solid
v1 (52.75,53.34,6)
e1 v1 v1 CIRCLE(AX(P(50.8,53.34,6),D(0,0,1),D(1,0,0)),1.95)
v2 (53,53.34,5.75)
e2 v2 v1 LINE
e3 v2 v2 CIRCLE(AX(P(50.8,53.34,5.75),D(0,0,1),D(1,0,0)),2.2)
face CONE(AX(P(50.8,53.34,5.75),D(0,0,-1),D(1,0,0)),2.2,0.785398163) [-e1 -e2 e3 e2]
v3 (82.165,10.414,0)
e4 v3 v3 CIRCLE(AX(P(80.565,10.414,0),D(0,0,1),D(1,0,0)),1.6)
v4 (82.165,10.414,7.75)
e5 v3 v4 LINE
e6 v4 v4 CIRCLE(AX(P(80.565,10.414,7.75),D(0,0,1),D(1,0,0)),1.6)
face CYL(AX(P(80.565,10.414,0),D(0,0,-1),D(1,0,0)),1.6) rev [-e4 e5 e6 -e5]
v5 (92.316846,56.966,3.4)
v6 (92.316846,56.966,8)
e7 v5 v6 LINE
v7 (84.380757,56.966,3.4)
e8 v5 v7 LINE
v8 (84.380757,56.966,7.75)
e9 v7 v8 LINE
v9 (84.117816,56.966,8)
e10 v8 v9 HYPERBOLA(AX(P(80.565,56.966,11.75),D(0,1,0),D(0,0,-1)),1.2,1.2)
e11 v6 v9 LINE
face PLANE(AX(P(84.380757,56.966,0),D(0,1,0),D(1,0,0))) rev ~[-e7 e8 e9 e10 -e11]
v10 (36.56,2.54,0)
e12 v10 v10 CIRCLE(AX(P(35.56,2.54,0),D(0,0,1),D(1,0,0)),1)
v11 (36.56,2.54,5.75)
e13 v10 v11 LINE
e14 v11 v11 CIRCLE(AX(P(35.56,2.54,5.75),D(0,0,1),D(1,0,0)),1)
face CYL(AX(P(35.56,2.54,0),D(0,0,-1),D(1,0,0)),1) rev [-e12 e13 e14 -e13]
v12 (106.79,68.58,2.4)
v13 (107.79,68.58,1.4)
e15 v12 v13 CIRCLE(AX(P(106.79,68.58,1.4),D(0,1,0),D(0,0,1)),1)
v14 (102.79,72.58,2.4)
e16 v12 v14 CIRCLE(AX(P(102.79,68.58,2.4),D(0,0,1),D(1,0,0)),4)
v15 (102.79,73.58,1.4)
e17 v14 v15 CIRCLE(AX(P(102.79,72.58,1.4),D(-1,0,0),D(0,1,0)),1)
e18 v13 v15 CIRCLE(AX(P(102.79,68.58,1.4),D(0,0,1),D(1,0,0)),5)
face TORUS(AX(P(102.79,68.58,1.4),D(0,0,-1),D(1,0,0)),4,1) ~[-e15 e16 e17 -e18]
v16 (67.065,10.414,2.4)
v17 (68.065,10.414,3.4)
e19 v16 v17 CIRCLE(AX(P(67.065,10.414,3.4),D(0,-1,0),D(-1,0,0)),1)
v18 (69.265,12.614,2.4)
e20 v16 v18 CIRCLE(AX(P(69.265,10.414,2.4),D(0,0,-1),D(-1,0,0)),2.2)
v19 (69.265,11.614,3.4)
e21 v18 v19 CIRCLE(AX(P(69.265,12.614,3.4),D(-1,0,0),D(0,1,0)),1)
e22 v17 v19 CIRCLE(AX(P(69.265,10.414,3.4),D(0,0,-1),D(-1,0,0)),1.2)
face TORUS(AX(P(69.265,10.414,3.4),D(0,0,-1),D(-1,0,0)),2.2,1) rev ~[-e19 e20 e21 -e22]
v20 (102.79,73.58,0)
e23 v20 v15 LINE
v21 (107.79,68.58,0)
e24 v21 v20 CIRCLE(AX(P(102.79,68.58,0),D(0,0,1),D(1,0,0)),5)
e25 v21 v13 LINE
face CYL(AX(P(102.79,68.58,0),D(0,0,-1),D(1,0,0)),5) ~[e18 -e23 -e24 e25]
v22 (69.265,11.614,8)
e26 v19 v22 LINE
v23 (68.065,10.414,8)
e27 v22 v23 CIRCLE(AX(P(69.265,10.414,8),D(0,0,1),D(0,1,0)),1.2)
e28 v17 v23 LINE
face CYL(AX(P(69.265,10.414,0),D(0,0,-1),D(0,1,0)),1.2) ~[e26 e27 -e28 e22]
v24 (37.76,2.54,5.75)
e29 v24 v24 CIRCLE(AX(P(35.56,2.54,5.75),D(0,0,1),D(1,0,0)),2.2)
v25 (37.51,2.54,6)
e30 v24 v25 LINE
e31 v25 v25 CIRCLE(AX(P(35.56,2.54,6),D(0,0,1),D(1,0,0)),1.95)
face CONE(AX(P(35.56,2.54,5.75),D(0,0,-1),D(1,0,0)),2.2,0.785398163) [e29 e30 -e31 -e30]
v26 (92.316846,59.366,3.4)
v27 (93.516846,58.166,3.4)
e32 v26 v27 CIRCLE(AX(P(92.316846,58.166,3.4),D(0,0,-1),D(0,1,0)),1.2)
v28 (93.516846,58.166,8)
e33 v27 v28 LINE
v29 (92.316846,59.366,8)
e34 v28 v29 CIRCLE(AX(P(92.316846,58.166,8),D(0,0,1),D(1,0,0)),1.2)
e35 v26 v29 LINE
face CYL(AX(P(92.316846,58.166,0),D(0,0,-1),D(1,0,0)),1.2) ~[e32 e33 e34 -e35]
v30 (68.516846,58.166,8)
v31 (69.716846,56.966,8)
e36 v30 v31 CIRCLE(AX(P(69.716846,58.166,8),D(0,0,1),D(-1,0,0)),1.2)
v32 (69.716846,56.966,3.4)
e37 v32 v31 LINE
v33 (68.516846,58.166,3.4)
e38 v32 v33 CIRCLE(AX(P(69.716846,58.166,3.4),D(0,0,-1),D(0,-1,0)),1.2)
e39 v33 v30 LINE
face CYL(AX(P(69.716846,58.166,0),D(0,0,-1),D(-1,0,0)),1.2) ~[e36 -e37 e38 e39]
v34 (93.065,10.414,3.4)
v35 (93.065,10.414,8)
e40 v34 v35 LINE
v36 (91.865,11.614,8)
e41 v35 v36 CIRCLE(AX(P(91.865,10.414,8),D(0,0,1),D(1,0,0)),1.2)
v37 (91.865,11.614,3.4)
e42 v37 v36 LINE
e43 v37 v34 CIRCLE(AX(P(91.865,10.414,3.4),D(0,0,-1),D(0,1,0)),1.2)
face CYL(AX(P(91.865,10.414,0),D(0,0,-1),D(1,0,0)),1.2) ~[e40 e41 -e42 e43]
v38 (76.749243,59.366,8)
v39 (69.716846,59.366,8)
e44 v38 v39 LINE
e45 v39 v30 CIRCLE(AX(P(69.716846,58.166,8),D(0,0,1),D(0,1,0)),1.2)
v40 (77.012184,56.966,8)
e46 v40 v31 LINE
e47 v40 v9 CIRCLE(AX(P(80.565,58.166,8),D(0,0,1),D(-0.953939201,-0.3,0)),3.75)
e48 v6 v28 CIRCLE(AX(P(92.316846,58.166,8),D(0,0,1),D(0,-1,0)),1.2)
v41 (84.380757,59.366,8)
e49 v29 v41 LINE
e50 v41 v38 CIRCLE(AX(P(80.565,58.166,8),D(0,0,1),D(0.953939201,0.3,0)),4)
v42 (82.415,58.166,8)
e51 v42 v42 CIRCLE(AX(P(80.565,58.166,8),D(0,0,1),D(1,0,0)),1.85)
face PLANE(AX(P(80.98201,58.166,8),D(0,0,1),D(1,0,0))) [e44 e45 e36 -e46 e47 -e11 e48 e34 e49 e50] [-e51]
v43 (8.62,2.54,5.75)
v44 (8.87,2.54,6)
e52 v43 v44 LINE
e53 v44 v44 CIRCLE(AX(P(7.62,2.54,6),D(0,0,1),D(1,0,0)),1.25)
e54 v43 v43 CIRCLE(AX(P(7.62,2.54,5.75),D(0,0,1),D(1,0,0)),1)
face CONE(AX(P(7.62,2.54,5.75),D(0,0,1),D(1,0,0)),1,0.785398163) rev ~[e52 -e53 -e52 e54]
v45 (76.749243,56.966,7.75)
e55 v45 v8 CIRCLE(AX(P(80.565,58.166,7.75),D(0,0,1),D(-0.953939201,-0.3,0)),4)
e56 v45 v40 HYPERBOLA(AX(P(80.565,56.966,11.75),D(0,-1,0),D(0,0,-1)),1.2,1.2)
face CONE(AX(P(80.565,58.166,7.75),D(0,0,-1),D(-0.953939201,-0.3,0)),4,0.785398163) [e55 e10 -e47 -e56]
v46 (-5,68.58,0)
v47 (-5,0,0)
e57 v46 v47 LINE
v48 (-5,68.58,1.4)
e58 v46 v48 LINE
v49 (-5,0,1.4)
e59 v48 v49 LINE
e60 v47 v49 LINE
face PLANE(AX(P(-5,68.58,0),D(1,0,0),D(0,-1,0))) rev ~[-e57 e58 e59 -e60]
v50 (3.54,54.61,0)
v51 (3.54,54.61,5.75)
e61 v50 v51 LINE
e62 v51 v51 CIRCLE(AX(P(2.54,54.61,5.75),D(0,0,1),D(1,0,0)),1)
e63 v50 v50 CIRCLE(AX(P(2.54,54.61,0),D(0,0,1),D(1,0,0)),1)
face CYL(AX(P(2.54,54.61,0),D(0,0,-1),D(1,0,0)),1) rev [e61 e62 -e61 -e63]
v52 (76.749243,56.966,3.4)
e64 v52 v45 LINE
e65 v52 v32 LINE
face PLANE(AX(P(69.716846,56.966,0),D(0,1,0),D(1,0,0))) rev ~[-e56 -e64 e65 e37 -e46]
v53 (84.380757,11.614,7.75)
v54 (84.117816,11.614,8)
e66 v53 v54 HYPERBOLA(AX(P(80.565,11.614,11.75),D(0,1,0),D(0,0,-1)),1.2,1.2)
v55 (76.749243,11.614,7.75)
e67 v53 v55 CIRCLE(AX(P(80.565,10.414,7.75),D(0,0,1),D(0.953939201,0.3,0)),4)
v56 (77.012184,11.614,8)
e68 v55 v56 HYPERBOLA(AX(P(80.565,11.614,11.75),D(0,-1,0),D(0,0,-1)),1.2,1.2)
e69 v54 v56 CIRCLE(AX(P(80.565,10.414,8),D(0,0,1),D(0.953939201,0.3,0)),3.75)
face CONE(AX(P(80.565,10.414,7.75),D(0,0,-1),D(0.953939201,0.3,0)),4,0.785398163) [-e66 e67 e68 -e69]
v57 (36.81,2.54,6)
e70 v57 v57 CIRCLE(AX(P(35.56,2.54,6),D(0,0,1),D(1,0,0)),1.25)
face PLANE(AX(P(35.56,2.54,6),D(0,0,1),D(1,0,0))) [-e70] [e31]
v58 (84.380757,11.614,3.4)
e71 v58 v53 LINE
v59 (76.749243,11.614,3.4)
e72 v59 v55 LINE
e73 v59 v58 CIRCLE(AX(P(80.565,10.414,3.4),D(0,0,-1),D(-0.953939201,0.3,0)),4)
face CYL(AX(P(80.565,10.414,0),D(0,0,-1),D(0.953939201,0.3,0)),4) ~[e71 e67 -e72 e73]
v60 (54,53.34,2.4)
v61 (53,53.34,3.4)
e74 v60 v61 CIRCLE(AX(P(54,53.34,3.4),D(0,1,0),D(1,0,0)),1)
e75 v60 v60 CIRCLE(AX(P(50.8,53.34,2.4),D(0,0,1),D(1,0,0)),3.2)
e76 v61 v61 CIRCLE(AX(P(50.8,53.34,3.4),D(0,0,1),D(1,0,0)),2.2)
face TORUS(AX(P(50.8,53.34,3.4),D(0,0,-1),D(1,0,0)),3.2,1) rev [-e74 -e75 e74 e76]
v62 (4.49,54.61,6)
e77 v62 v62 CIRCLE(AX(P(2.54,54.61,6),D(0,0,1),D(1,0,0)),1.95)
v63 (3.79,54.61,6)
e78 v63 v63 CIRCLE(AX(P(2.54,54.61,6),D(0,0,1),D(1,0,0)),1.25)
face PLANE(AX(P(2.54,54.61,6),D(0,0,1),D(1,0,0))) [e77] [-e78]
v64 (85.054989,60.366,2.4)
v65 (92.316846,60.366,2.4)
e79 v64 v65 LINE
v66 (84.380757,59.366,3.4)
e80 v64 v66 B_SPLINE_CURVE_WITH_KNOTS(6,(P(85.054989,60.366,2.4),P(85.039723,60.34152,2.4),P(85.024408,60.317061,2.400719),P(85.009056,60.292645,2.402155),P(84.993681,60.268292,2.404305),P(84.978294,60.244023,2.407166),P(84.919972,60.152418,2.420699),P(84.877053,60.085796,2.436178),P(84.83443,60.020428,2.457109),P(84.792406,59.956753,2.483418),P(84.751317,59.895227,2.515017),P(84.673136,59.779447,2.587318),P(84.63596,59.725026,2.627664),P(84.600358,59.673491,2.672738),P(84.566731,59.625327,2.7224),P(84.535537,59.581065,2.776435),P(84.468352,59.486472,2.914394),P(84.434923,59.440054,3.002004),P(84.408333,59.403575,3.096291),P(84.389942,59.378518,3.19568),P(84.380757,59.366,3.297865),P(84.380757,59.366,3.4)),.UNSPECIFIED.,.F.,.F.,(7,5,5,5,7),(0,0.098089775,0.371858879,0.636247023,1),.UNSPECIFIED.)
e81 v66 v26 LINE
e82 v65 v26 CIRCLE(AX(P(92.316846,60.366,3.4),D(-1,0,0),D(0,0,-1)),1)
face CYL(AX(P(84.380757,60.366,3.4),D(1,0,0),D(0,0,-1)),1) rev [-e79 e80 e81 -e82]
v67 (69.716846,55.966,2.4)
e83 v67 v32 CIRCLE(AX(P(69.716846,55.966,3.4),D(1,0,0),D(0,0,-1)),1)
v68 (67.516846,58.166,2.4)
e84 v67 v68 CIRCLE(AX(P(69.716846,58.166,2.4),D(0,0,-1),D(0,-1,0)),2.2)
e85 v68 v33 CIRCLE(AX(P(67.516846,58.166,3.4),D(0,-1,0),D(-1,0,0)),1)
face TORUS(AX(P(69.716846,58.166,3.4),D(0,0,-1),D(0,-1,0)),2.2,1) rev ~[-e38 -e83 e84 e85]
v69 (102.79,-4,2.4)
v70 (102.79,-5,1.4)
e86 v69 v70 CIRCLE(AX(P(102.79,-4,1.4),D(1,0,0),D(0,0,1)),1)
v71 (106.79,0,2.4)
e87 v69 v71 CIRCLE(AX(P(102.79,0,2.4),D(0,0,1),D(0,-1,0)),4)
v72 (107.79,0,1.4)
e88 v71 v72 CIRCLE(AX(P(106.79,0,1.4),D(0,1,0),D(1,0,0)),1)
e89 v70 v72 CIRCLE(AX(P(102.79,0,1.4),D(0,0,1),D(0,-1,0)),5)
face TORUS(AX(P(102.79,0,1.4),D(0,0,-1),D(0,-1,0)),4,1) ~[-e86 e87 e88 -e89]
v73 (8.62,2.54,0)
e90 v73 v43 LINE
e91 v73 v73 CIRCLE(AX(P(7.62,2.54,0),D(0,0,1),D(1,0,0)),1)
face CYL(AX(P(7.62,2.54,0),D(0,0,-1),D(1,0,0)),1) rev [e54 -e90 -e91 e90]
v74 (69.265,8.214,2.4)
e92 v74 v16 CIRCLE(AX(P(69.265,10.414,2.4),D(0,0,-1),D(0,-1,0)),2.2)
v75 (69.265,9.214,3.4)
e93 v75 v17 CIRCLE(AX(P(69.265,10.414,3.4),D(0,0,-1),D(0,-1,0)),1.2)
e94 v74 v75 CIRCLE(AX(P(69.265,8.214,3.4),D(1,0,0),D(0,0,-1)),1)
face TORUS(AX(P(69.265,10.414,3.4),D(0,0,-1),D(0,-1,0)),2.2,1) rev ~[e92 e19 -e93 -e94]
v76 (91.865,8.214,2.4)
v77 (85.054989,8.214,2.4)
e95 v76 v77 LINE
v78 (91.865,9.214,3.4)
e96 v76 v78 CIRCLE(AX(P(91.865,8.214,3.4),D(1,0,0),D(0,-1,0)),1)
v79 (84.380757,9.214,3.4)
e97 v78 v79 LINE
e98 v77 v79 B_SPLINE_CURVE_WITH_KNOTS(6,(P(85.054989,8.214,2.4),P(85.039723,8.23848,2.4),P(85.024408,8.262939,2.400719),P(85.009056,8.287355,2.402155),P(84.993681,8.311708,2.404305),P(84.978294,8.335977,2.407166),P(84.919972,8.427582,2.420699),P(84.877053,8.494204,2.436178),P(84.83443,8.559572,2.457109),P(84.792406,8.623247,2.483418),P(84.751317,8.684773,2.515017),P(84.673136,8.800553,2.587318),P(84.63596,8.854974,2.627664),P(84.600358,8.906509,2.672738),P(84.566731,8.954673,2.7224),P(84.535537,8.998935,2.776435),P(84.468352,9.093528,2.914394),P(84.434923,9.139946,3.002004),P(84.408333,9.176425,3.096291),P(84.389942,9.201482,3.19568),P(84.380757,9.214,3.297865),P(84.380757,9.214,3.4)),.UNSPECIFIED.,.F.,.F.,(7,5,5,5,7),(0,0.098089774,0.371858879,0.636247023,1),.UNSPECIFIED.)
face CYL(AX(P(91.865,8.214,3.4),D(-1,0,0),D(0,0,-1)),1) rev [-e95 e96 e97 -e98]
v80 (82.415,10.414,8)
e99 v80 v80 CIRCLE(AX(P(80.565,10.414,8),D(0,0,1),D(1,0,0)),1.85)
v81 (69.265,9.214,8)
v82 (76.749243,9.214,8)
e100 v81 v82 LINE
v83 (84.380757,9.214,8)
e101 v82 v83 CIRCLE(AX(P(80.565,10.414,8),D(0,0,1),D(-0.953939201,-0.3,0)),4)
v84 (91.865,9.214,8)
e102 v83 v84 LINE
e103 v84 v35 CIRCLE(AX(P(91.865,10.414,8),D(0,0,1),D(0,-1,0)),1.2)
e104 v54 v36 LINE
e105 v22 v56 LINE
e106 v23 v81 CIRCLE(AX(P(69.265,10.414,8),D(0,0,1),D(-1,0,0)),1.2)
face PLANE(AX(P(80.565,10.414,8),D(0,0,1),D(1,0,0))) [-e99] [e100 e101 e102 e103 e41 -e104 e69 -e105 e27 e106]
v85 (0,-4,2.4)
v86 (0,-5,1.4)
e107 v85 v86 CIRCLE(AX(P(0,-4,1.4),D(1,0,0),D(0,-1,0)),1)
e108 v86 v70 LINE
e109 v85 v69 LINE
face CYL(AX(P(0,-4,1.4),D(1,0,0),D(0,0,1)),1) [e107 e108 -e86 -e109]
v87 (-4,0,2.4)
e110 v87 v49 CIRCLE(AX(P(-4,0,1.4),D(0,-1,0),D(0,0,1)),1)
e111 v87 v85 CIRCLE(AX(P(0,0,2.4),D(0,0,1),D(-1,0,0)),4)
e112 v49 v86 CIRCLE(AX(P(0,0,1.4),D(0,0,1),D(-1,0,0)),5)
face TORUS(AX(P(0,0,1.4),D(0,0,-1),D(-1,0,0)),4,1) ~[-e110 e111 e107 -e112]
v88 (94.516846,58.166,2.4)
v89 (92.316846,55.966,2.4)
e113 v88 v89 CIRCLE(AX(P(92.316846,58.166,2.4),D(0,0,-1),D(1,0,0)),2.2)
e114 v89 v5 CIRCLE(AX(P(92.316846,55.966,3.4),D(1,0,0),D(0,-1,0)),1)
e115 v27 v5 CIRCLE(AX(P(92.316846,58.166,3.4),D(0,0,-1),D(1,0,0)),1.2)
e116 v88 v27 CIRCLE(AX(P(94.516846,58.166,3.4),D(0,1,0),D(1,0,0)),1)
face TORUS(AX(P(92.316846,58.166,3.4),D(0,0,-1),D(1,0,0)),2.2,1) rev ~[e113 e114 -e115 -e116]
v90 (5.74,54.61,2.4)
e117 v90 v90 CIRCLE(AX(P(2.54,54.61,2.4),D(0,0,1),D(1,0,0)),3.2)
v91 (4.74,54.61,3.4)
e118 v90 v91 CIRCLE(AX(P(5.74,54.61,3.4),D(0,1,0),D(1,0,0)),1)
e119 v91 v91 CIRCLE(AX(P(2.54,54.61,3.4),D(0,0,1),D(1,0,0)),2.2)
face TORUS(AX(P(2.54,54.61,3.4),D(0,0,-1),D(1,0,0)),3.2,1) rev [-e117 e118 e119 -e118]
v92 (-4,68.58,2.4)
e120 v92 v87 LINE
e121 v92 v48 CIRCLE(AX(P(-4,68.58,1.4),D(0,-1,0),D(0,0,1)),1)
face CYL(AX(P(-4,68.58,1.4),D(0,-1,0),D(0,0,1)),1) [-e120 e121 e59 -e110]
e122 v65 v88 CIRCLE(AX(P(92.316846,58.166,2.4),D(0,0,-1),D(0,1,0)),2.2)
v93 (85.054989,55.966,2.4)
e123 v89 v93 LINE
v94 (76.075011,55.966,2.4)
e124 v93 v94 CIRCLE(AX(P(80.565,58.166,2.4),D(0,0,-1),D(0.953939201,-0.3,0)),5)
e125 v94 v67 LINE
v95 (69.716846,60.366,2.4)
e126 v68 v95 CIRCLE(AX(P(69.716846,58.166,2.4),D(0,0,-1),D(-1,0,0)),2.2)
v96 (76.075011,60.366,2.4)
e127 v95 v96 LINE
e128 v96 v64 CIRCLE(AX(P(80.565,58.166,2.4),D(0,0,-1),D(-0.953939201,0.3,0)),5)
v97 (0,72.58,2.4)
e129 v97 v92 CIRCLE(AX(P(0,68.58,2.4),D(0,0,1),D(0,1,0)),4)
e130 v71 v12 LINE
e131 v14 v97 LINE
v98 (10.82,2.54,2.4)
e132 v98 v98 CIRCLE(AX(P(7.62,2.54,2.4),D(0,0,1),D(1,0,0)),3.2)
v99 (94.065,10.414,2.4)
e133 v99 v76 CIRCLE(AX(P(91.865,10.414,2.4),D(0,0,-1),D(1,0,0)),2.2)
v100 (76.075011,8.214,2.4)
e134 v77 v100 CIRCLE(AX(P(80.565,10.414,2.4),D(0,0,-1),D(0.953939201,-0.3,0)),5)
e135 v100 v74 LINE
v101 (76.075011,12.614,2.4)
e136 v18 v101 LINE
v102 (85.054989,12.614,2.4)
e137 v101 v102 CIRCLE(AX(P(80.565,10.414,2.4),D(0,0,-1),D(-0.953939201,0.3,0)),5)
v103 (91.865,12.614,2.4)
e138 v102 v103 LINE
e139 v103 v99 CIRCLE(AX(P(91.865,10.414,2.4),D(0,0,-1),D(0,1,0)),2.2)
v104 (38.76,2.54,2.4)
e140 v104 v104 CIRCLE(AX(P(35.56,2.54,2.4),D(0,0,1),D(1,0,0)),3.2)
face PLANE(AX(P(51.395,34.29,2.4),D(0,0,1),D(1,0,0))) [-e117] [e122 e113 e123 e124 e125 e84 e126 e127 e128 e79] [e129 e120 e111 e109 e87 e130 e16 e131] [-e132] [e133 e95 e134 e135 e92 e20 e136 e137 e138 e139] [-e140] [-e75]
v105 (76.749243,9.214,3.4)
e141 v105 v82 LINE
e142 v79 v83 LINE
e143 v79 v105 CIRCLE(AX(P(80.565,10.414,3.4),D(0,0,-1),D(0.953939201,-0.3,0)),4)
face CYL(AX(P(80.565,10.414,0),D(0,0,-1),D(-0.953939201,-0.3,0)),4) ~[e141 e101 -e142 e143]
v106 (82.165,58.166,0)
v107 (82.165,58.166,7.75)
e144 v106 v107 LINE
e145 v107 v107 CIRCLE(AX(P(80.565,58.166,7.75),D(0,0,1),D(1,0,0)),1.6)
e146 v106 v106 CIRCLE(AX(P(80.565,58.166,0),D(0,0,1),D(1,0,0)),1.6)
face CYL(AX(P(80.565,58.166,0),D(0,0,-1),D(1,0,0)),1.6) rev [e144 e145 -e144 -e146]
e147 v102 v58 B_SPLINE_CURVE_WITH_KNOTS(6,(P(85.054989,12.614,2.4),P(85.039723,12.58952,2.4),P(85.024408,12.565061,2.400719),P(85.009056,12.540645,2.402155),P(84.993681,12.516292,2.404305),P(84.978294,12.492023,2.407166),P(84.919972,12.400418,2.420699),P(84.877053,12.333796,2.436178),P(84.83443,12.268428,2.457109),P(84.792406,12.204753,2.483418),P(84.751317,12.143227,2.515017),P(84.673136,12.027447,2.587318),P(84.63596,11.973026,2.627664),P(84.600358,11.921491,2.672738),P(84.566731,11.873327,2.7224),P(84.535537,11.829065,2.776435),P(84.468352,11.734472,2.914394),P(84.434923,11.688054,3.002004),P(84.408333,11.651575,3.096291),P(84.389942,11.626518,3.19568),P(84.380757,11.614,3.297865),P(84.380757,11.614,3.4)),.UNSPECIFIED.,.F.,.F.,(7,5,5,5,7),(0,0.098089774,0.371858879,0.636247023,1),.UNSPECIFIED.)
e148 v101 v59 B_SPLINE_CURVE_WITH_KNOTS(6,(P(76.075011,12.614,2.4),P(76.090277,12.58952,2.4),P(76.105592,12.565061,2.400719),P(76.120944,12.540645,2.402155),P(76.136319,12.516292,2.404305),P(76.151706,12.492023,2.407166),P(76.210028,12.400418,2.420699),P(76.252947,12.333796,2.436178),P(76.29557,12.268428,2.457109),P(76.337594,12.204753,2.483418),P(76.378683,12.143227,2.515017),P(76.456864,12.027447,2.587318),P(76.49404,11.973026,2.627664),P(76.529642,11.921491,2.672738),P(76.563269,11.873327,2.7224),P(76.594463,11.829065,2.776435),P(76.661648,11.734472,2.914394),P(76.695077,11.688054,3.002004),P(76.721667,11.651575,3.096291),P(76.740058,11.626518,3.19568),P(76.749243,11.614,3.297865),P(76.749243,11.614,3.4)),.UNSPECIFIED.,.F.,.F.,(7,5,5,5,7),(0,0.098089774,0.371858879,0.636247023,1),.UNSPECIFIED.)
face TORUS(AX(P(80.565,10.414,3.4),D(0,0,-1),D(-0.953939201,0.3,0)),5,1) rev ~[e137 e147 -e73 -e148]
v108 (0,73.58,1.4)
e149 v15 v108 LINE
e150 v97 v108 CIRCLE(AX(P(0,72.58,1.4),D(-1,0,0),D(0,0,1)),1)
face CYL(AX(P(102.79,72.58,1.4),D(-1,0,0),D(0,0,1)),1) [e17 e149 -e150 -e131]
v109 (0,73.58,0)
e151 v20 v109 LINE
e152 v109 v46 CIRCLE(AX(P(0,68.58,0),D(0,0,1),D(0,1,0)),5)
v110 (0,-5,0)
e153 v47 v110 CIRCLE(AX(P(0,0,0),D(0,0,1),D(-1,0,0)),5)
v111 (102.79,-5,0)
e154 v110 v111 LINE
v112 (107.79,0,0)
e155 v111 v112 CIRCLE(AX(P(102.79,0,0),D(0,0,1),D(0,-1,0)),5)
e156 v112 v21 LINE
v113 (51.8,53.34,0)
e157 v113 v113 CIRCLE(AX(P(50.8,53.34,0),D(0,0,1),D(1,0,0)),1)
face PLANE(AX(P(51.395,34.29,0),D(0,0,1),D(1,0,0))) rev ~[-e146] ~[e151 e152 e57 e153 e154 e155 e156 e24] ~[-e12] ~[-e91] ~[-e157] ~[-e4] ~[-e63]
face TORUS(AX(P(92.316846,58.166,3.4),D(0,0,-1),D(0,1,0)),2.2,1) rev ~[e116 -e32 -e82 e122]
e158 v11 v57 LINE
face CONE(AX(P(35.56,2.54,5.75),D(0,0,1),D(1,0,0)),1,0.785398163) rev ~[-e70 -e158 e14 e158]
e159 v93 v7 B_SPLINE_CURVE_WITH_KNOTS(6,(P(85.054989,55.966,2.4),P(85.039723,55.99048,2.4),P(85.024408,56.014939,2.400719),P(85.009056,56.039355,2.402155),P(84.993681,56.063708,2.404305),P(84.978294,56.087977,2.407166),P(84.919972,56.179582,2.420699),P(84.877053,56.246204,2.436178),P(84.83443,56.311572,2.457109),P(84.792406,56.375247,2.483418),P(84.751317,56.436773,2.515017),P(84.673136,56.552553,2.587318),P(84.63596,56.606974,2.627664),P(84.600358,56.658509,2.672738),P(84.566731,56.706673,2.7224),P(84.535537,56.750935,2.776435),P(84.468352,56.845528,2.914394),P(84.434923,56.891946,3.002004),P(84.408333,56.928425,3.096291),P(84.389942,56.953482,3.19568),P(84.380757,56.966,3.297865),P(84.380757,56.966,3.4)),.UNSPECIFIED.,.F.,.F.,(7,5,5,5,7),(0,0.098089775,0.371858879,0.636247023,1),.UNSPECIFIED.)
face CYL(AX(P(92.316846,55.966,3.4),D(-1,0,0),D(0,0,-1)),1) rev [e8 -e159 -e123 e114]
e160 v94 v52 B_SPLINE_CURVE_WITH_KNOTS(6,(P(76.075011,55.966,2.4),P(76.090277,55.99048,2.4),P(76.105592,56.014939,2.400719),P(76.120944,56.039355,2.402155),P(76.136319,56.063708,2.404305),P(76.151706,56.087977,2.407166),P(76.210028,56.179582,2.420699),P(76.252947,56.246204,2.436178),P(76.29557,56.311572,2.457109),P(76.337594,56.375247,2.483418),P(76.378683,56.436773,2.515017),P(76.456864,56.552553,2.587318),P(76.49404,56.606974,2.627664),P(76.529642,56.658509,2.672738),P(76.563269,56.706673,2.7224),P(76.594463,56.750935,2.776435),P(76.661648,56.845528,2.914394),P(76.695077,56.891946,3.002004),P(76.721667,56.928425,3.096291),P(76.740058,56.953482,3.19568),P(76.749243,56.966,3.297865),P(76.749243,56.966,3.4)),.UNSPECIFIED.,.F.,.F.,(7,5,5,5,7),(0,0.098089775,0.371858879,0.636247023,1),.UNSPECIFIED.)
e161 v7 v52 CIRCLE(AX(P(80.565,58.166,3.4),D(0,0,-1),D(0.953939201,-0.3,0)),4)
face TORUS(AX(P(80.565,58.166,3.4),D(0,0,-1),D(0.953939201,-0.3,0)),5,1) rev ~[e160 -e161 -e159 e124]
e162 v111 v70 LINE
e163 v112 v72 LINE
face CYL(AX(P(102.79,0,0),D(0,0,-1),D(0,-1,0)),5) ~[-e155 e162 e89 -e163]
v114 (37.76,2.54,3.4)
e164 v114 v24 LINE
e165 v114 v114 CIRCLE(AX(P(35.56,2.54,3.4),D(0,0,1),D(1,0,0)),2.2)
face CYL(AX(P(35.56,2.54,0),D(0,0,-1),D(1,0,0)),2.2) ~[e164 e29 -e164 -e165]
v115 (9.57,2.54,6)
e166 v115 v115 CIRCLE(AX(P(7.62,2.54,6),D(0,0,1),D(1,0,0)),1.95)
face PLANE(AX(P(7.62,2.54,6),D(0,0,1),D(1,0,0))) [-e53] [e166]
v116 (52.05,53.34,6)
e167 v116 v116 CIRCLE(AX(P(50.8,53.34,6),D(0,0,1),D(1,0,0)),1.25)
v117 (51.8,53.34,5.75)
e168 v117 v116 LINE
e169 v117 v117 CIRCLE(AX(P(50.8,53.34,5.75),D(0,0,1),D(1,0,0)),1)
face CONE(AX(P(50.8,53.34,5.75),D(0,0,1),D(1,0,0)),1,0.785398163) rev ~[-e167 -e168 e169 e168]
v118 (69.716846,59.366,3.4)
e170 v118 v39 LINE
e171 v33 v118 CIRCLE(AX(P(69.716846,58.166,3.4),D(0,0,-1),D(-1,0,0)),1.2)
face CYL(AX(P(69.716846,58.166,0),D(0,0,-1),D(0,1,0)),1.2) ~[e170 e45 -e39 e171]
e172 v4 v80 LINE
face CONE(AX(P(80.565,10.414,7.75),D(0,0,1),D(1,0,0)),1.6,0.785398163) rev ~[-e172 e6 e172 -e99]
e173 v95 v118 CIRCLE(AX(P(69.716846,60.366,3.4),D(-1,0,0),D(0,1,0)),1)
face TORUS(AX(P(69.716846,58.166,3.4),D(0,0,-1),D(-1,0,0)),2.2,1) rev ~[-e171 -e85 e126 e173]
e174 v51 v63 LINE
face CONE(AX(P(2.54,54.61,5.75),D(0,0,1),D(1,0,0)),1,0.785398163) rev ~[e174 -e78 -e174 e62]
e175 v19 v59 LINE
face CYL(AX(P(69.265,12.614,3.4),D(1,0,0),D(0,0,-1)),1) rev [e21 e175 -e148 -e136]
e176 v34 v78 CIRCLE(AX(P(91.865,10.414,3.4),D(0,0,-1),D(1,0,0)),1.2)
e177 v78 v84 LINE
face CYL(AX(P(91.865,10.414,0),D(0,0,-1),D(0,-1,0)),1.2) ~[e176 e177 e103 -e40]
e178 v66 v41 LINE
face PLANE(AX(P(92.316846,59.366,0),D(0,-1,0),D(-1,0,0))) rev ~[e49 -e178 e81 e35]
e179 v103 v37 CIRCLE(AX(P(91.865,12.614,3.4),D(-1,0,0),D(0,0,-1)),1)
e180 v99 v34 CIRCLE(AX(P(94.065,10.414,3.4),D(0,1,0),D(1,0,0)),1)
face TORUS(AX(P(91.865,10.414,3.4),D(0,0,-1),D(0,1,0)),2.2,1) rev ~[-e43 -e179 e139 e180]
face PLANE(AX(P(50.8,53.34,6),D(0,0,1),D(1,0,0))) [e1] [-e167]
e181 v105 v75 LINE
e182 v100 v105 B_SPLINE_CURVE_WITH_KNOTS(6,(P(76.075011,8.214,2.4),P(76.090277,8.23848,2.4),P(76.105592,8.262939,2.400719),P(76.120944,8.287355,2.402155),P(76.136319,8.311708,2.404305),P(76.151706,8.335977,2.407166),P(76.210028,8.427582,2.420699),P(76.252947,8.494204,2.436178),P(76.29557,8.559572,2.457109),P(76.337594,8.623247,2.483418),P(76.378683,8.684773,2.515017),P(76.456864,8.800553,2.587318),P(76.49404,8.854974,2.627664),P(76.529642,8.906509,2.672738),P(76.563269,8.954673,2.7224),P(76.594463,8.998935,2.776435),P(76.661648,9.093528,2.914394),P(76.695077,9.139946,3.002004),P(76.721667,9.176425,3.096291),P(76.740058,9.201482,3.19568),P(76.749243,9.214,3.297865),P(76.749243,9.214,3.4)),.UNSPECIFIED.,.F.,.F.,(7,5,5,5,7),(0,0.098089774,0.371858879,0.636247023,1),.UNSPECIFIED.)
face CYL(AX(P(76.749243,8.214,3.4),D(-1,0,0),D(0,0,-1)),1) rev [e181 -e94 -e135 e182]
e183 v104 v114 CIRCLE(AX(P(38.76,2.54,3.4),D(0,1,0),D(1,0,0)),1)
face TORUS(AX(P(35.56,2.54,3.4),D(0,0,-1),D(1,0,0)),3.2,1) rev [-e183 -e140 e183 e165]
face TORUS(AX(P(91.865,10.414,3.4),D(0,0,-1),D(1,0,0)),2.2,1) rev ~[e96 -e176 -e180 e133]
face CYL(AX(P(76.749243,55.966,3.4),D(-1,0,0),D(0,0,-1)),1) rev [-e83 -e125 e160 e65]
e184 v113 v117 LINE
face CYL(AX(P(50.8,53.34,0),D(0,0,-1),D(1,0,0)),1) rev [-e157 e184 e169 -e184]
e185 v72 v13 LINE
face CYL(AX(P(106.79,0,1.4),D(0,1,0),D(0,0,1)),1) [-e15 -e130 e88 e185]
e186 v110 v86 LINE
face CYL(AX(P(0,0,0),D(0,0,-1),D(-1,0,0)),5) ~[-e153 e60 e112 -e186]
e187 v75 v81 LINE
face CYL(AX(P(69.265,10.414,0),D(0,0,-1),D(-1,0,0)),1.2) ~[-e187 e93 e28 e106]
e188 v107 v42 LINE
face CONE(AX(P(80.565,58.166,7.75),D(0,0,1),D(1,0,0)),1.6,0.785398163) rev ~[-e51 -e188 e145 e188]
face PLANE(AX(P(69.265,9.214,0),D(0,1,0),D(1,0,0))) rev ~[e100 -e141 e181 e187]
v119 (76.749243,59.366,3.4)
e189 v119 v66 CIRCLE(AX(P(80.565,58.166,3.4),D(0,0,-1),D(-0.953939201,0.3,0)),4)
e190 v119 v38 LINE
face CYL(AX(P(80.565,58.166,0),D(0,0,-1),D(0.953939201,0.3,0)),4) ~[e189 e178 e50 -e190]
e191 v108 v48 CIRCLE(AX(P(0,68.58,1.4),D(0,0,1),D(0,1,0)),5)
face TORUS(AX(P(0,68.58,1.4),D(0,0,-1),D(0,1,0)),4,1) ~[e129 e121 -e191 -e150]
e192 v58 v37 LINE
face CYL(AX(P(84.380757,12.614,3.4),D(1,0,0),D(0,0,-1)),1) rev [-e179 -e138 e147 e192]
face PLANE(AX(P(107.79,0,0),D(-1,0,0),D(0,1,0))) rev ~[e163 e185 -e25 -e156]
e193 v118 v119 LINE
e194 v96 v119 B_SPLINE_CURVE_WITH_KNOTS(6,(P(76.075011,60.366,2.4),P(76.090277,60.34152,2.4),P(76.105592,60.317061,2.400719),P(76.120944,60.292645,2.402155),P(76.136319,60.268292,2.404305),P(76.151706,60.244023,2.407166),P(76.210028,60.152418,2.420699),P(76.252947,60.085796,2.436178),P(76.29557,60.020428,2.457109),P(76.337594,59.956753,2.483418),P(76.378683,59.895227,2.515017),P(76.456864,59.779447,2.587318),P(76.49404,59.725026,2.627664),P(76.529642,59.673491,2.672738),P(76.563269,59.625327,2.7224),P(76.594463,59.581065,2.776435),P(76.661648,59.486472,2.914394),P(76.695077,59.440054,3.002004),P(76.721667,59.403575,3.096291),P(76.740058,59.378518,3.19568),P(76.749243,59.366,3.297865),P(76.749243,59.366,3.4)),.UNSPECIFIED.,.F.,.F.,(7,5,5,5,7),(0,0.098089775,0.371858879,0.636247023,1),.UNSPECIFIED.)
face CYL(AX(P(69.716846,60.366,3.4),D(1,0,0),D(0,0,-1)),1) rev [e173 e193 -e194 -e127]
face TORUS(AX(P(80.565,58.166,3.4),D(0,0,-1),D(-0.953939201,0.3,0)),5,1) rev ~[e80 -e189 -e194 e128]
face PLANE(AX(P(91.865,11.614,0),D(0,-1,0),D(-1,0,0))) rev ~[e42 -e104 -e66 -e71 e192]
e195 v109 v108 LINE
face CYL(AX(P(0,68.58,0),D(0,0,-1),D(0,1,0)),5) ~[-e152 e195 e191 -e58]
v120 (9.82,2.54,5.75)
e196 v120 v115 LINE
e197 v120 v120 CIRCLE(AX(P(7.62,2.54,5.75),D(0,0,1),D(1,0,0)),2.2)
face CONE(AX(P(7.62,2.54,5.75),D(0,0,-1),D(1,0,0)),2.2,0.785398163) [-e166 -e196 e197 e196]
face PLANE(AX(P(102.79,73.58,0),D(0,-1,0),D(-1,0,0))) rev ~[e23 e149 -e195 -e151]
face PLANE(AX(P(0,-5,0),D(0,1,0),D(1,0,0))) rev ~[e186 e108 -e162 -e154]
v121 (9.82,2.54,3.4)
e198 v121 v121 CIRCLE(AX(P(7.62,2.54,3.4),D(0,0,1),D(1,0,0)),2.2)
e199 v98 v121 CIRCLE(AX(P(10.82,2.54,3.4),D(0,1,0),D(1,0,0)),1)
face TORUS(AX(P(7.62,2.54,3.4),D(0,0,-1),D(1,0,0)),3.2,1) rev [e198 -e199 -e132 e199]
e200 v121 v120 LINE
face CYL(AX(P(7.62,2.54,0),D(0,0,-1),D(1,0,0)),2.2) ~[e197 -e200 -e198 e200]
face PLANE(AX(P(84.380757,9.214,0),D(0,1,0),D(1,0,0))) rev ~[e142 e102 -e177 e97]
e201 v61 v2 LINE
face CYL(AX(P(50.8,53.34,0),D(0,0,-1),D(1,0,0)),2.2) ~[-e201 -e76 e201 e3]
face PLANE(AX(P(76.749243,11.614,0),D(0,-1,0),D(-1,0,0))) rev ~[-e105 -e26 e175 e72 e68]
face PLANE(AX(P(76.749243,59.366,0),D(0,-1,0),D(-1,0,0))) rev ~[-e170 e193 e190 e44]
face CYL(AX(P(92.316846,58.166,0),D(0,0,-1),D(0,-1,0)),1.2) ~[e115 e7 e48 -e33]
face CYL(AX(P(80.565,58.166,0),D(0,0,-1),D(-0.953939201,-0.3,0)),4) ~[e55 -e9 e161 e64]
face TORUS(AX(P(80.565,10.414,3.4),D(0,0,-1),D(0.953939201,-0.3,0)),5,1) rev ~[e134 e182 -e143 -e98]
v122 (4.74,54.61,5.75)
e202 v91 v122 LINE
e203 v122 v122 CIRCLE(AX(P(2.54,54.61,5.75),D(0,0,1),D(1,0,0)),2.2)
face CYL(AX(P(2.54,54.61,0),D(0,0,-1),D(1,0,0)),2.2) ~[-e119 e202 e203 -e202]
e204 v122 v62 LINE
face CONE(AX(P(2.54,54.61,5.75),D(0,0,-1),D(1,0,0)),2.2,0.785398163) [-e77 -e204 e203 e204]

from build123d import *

# Parameters (mm, degrees)
F0_R     = 2.2
F0_R_2   = 1
F1_DEPTH = 6
F0_R_3   = 1.6
F2_DEPTH = 8
F0_W     = 102.79
F0_H     = 68.58
F3_DEPTH = 2.4
F4_SIZE  = 0.25
F5_R     = 1
F6_R     = 1
F7_R     = 1


with BuildPart() as f1:
    # F0 (on Top) → F1 (new body)
    with BuildSketch(Plane.XY):
        with Locations((2.54, 54.61)):
            Circle(F0_R)
        with Locations((2.54, 54.61)):
            Circle(F0_R_2, mode=Mode.SUBTRACT)
    extrude(amount=F1_DEPTH)



with BuildPart() as f1b:
    # F0 (on Top) → F1, piece 2 (new body)
    with BuildSketch(Plane.XY):
        with Locations((7.62, 2.54)):
            Circle(F0_R)
        with Locations((7.62, 2.54)):
            Circle(F0_R_2, mode=Mode.SUBTRACT)
    extrude(amount=F1_DEPTH)


with BuildPart() as f1c:
    # F0 (on Top) → F1, piece 3 (new body)
    with BuildSketch(Plane.XY):
        with Locations((35.56, 2.54)):
            Circle(F0_R)
        with Locations((35.56, 2.54)):
            Circle(F0_R_2, mode=Mode.SUBTRACT)
    extrude(amount=F1_DEPTH)


with BuildPart() as f1d:
    # F0 (on Top) → F1, piece 4 (new body)
    with BuildSketch(Plane.XY):
        with Locations((50.8, 53.34)):
            Circle(F0_R)
        with Locations((50.8, 53.34)):
            Circle(F0_R_2, mode=Mode.SUBTRACT)
    extrude(amount=F1_DEPTH)


with BuildPart() as f2:
    # F0 (on Top) → F2 (new body)
    with BuildSketch(Plane.XY):
        with BuildLine():
            Line((69.7168460011, 56.966), (76.7492431943, 56.966))
            ThreePointArc((76.7492431943, 56.966), (80.565, 54.166), (84.3807568057, 56.966))
            Line((84.3807568057, 56.966), (92.3168460011, 56.966))
            ThreePointArc((92.3168460011, 56.966), (93.1653741386, 57.3174718626), (93.5168460011, 58.166))
            ThreePointArc((93.5168460011, 58.166), (93.1653741386, 59.0145281374), (92.3168460011, 59.366))
            Line((92.3168460011, 59.366), (84.3807568057, 59.366))
            ThreePointArc((84.3807568057, 59.366), (80.565, 62.166), (76.7492431943, 59.366))
            Line((76.7492431943, 59.366), (69.7168460011, 59.366))
            ThreePointArc((69.7168460011, 59.366), (68.8683178637, 59.0145281374), (68.5168460011, 58.166))
            ThreePointArc((68.5168460011, 58.166), (68.8683178637, 57.3174718626), (69.7168460011, 56.966))
        make_face()
        with Locations((80.565, 58.166)):
            Circle(F0_R_3, mode=Mode.SUBTRACT)
    extrude(amount=F2_DEPTH)


with BuildPart() as f2b:
    # F0 (on Top) → F2, piece 2 (new body)
    with BuildSketch(Plane.XY):
        with BuildLine():
            Line((91.865, 11.614), (84.3807568057, 11.614))
            ThreePointArc((84.3807568057, 11.614), (80.565, 14.414), (76.7492431943, 11.614))
            Line((76.7492431943, 11.614), (69.265, 11.614))
            ThreePointArc((69.265, 11.614), (68.4164718626, 11.2625281374), (68.065, 10.414))
            ThreePointArc((68.065, 10.414), (68.4164718626, 9.5654718626), (69.265, 9.214))
            Line((69.265, 9.214), (76.7492431943, 9.214))
            ThreePointArc((76.7492431943, 9.214), (80.565, 6.414), (84.3807568057, 9.214))
            Line((84.3807568057, 9.214), (91.865, 9.214))
            ThreePointArc((91.865, 9.214), (92.7135281374, 9.5654718626), (93.065, 10.414))
            ThreePointArc((93.065, 10.414), (92.7135281374, 11.2625281374), (91.865, 11.614))
        make_face()
        with Locations((80.565, 10.414)):
            Circle(F0_R_3, mode=Mode.SUBTRACT)
    extrude(amount=F2_DEPTH)


with BuildPart() as f1_1:
    add(f1.part)

    add(f1b.part)  # F3 merges F1b

    add(f1c.part)  # F3 merges F1c

    add(f1d.part)  # F3 merges F1d

    add(f2.part)  # F3 merges F2

    add(f2b.part)  # F3 merges F2b
    # F0 (on Top) → F3 (join)
    with BuildSketch(Plane.XY):
        with BuildLine():
            Line((-5, 68.58), (-5, 0))
            ThreePointArc((-5, 0), (-3.5355339059, -3.5355339059), (0, -5))
            Line((0, -5), (102.79, -5))
            ThreePointArc((102.79, -5), (106.3255339059, -3.5355339059), (107.79, 0))
            Line((107.79, 0), (107.79, 68.58))
            ThreePointArc((107.79, 68.58), (106.3255339059, 72.1155339059), (102.79, 73.58))
            Line((102.79, 73.58), (0, 73.58))
            ThreePointArc((0, 73.58), (-3.5355339059, 72.1155339059), (-5, 68.58))
        make_face()
        with Locations((51.395, 34.29)):
            Rectangle(F0_W, F0_H, mode=Mode.SUBTRACT)
        with Locations((51.395, 34.29)):
            Rectangle(F0_W, F0_H)
        with Locations((7.62, 2.54)):
            Circle(F0_R, mode=Mode.SUBTRACT)
        with Locations((35.56, 2.54)):
            Circle(F0_R, mode=Mode.SUBTRACT)
        with BuildLine():
            ThreePointArc((76.7492431943, 11.614), (80.565, 14.414), (84.3807568057, 11.614))
            Line((84.3807568057, 11.614), (91.865, 11.614))
            ThreePointArc((91.865, 11.614), (92.7135281374, 11.2625281374), (93.065, 10.414))
            ThreePointArc((93.065, 10.414), (92.7135281374, 9.5654718626), (91.865, 9.214))
            Line((91.865, 9.214), (84.3807568057, 9.214))
            ThreePointArc((84.3807568057, 9.214), (80.565, 6.414), (76.7492431943, 9.214))
            Line((76.7492431943, 9.214), (69.265, 9.214))
            ThreePointArc((69.265, 9.214), (68.4164718626, 9.5654718626), (68.065, 10.414))
            ThreePointArc((68.065, 10.414), (68.4164718626, 11.2625281374), (69.265, 11.614))
            Line((69.265, 11.614), (76.7492431943, 11.614))
        make_face(mode=Mode.SUBTRACT)
        with Locations((50.8, 53.34)):
            Circle(F0_R, mode=Mode.SUBTRACT)
        with Locations((2.54, 54.61)):
            Circle(F0_R, mode=Mode.SUBTRACT)
        with BuildLine():
            ThreePointArc((84.3807568057, 56.966), (80.565, 54.166), (76.7492431943, 56.966))
            Line((76.7492431943, 56.966), (69.7168460011, 56.966))
            ThreePointArc((69.7168460011, 56.966), (68.8683178637, 57.3174718626), (68.5168460011, 58.166))
            ThreePointArc((68.5168460011, 58.166), (68.8683178637, 59.0145281374), (69.7168460011, 59.366))
            Line((69.7168460011, 59.366), (76.7492431943, 59.366))
            ThreePointArc((76.7492431943, 59.366), (80.565, 62.166), (84.3807568057, 59.366))
            Line((84.3807568057, 59.366), (92.3168460011, 59.366))
            ThreePointArc((92.3168460011, 59.366), (93.1653741386, 59.0145281374), (93.5168460011, 58.166))
            ThreePointArc((93.5168460011, 58.166), (93.1653741386, 57.3174718626), (92.3168460011, 56.966))
            Line((92.3168460011, 56.966), (84.3807568057, 56.966))
        make_face(mode=Mode.SUBTRACT)
    extrude(amount=F3_DEPTH)

    # F4
    f4_edges = [f1_1.edges().sort_by_distance(p)[0] for p in [
        (0.34, 54.61, 6),
        (1.54, 54.61, 6),
        (6.62, 2.54, 6),
        (5.42, 2.54, 6),
        (34.56, 2.54, 6),
        (33.36, 2.54, 6),
        (49.8, 53.34, 6),
        (48.6, 53.34, 6),
        (78.965, 58.166, 8),
        (80.565, 54.166, 8),
        (80.565, 14.414, 8),
        (78.965, 10.414, 8),
    ]]
    chamfer(f4_edges, length=F4_SIZE)

    # F5
    f5_edges = [f1_1.edges().sort_by_distance(p)[0] for p in [
        (0.34, 54.61, 2.4),
    ]]
    fillet(f5_edges, radius=F5_R)

    # F6
    f6_edges = [f1_1.edges().sort_by_distance(p)[0] for p in [
        (5.42, 2.54, 2.4),
        (33.36, 2.54, 2.4),
        (48.6, 53.34, 2.4),
    ]]
    fillet(f6_edges, radius=F6_R)

    # F7
    f7_edges = [f1_1.edges().sort_by_distance(p)[0] for p in [
        (4.42, 2.54, 2.4),
        (-0.66, 54.61, 2.4),
        (-5, 34.29, 2.4),
        (-3.535534, -3.535534, 2.4),
        (51.395, -5, 2.4),
        (106.325534, -3.535534, 2.4),
        (107.79, 34.29, 2.4),
        (106.325534, 72.115534, 2.4),
        (51.395, 73.58, 2.4),
        (-3.535534, 72.115534, 2.4),
        (93.516846, 58.166, 2.4),
        (88.348801, 56.966, 2.4),
        (80.565, 54.166, 2.4),
        (73.233045, 56.966, 2.4),
        (68.516846, 58.166, 2.4),
        (73.233045, 59.366, 2.4),
        (80.565, 62.166, 2.4),
        (88.348801, 59.366, 2.4),
        (73.007122, 11.614, 2.4),
        (80.565, 14.414, 2.4),
        (88.122878, 11.614, 2.4),
        (93.065, 10.414, 2.4),
        (88.122878, 9.214, 2.4),
        (80.565, 6.414, 2.4),
        (73.007122, 9.214, 2.4),
        (68.065, 10.414, 2.4),
        (32.36, 2.54, 2.4),
        (47.6, 53.34, 2.4),
    ]]
    fillet(f7_edges, radius=F7_R)


solid = f1_1.part
